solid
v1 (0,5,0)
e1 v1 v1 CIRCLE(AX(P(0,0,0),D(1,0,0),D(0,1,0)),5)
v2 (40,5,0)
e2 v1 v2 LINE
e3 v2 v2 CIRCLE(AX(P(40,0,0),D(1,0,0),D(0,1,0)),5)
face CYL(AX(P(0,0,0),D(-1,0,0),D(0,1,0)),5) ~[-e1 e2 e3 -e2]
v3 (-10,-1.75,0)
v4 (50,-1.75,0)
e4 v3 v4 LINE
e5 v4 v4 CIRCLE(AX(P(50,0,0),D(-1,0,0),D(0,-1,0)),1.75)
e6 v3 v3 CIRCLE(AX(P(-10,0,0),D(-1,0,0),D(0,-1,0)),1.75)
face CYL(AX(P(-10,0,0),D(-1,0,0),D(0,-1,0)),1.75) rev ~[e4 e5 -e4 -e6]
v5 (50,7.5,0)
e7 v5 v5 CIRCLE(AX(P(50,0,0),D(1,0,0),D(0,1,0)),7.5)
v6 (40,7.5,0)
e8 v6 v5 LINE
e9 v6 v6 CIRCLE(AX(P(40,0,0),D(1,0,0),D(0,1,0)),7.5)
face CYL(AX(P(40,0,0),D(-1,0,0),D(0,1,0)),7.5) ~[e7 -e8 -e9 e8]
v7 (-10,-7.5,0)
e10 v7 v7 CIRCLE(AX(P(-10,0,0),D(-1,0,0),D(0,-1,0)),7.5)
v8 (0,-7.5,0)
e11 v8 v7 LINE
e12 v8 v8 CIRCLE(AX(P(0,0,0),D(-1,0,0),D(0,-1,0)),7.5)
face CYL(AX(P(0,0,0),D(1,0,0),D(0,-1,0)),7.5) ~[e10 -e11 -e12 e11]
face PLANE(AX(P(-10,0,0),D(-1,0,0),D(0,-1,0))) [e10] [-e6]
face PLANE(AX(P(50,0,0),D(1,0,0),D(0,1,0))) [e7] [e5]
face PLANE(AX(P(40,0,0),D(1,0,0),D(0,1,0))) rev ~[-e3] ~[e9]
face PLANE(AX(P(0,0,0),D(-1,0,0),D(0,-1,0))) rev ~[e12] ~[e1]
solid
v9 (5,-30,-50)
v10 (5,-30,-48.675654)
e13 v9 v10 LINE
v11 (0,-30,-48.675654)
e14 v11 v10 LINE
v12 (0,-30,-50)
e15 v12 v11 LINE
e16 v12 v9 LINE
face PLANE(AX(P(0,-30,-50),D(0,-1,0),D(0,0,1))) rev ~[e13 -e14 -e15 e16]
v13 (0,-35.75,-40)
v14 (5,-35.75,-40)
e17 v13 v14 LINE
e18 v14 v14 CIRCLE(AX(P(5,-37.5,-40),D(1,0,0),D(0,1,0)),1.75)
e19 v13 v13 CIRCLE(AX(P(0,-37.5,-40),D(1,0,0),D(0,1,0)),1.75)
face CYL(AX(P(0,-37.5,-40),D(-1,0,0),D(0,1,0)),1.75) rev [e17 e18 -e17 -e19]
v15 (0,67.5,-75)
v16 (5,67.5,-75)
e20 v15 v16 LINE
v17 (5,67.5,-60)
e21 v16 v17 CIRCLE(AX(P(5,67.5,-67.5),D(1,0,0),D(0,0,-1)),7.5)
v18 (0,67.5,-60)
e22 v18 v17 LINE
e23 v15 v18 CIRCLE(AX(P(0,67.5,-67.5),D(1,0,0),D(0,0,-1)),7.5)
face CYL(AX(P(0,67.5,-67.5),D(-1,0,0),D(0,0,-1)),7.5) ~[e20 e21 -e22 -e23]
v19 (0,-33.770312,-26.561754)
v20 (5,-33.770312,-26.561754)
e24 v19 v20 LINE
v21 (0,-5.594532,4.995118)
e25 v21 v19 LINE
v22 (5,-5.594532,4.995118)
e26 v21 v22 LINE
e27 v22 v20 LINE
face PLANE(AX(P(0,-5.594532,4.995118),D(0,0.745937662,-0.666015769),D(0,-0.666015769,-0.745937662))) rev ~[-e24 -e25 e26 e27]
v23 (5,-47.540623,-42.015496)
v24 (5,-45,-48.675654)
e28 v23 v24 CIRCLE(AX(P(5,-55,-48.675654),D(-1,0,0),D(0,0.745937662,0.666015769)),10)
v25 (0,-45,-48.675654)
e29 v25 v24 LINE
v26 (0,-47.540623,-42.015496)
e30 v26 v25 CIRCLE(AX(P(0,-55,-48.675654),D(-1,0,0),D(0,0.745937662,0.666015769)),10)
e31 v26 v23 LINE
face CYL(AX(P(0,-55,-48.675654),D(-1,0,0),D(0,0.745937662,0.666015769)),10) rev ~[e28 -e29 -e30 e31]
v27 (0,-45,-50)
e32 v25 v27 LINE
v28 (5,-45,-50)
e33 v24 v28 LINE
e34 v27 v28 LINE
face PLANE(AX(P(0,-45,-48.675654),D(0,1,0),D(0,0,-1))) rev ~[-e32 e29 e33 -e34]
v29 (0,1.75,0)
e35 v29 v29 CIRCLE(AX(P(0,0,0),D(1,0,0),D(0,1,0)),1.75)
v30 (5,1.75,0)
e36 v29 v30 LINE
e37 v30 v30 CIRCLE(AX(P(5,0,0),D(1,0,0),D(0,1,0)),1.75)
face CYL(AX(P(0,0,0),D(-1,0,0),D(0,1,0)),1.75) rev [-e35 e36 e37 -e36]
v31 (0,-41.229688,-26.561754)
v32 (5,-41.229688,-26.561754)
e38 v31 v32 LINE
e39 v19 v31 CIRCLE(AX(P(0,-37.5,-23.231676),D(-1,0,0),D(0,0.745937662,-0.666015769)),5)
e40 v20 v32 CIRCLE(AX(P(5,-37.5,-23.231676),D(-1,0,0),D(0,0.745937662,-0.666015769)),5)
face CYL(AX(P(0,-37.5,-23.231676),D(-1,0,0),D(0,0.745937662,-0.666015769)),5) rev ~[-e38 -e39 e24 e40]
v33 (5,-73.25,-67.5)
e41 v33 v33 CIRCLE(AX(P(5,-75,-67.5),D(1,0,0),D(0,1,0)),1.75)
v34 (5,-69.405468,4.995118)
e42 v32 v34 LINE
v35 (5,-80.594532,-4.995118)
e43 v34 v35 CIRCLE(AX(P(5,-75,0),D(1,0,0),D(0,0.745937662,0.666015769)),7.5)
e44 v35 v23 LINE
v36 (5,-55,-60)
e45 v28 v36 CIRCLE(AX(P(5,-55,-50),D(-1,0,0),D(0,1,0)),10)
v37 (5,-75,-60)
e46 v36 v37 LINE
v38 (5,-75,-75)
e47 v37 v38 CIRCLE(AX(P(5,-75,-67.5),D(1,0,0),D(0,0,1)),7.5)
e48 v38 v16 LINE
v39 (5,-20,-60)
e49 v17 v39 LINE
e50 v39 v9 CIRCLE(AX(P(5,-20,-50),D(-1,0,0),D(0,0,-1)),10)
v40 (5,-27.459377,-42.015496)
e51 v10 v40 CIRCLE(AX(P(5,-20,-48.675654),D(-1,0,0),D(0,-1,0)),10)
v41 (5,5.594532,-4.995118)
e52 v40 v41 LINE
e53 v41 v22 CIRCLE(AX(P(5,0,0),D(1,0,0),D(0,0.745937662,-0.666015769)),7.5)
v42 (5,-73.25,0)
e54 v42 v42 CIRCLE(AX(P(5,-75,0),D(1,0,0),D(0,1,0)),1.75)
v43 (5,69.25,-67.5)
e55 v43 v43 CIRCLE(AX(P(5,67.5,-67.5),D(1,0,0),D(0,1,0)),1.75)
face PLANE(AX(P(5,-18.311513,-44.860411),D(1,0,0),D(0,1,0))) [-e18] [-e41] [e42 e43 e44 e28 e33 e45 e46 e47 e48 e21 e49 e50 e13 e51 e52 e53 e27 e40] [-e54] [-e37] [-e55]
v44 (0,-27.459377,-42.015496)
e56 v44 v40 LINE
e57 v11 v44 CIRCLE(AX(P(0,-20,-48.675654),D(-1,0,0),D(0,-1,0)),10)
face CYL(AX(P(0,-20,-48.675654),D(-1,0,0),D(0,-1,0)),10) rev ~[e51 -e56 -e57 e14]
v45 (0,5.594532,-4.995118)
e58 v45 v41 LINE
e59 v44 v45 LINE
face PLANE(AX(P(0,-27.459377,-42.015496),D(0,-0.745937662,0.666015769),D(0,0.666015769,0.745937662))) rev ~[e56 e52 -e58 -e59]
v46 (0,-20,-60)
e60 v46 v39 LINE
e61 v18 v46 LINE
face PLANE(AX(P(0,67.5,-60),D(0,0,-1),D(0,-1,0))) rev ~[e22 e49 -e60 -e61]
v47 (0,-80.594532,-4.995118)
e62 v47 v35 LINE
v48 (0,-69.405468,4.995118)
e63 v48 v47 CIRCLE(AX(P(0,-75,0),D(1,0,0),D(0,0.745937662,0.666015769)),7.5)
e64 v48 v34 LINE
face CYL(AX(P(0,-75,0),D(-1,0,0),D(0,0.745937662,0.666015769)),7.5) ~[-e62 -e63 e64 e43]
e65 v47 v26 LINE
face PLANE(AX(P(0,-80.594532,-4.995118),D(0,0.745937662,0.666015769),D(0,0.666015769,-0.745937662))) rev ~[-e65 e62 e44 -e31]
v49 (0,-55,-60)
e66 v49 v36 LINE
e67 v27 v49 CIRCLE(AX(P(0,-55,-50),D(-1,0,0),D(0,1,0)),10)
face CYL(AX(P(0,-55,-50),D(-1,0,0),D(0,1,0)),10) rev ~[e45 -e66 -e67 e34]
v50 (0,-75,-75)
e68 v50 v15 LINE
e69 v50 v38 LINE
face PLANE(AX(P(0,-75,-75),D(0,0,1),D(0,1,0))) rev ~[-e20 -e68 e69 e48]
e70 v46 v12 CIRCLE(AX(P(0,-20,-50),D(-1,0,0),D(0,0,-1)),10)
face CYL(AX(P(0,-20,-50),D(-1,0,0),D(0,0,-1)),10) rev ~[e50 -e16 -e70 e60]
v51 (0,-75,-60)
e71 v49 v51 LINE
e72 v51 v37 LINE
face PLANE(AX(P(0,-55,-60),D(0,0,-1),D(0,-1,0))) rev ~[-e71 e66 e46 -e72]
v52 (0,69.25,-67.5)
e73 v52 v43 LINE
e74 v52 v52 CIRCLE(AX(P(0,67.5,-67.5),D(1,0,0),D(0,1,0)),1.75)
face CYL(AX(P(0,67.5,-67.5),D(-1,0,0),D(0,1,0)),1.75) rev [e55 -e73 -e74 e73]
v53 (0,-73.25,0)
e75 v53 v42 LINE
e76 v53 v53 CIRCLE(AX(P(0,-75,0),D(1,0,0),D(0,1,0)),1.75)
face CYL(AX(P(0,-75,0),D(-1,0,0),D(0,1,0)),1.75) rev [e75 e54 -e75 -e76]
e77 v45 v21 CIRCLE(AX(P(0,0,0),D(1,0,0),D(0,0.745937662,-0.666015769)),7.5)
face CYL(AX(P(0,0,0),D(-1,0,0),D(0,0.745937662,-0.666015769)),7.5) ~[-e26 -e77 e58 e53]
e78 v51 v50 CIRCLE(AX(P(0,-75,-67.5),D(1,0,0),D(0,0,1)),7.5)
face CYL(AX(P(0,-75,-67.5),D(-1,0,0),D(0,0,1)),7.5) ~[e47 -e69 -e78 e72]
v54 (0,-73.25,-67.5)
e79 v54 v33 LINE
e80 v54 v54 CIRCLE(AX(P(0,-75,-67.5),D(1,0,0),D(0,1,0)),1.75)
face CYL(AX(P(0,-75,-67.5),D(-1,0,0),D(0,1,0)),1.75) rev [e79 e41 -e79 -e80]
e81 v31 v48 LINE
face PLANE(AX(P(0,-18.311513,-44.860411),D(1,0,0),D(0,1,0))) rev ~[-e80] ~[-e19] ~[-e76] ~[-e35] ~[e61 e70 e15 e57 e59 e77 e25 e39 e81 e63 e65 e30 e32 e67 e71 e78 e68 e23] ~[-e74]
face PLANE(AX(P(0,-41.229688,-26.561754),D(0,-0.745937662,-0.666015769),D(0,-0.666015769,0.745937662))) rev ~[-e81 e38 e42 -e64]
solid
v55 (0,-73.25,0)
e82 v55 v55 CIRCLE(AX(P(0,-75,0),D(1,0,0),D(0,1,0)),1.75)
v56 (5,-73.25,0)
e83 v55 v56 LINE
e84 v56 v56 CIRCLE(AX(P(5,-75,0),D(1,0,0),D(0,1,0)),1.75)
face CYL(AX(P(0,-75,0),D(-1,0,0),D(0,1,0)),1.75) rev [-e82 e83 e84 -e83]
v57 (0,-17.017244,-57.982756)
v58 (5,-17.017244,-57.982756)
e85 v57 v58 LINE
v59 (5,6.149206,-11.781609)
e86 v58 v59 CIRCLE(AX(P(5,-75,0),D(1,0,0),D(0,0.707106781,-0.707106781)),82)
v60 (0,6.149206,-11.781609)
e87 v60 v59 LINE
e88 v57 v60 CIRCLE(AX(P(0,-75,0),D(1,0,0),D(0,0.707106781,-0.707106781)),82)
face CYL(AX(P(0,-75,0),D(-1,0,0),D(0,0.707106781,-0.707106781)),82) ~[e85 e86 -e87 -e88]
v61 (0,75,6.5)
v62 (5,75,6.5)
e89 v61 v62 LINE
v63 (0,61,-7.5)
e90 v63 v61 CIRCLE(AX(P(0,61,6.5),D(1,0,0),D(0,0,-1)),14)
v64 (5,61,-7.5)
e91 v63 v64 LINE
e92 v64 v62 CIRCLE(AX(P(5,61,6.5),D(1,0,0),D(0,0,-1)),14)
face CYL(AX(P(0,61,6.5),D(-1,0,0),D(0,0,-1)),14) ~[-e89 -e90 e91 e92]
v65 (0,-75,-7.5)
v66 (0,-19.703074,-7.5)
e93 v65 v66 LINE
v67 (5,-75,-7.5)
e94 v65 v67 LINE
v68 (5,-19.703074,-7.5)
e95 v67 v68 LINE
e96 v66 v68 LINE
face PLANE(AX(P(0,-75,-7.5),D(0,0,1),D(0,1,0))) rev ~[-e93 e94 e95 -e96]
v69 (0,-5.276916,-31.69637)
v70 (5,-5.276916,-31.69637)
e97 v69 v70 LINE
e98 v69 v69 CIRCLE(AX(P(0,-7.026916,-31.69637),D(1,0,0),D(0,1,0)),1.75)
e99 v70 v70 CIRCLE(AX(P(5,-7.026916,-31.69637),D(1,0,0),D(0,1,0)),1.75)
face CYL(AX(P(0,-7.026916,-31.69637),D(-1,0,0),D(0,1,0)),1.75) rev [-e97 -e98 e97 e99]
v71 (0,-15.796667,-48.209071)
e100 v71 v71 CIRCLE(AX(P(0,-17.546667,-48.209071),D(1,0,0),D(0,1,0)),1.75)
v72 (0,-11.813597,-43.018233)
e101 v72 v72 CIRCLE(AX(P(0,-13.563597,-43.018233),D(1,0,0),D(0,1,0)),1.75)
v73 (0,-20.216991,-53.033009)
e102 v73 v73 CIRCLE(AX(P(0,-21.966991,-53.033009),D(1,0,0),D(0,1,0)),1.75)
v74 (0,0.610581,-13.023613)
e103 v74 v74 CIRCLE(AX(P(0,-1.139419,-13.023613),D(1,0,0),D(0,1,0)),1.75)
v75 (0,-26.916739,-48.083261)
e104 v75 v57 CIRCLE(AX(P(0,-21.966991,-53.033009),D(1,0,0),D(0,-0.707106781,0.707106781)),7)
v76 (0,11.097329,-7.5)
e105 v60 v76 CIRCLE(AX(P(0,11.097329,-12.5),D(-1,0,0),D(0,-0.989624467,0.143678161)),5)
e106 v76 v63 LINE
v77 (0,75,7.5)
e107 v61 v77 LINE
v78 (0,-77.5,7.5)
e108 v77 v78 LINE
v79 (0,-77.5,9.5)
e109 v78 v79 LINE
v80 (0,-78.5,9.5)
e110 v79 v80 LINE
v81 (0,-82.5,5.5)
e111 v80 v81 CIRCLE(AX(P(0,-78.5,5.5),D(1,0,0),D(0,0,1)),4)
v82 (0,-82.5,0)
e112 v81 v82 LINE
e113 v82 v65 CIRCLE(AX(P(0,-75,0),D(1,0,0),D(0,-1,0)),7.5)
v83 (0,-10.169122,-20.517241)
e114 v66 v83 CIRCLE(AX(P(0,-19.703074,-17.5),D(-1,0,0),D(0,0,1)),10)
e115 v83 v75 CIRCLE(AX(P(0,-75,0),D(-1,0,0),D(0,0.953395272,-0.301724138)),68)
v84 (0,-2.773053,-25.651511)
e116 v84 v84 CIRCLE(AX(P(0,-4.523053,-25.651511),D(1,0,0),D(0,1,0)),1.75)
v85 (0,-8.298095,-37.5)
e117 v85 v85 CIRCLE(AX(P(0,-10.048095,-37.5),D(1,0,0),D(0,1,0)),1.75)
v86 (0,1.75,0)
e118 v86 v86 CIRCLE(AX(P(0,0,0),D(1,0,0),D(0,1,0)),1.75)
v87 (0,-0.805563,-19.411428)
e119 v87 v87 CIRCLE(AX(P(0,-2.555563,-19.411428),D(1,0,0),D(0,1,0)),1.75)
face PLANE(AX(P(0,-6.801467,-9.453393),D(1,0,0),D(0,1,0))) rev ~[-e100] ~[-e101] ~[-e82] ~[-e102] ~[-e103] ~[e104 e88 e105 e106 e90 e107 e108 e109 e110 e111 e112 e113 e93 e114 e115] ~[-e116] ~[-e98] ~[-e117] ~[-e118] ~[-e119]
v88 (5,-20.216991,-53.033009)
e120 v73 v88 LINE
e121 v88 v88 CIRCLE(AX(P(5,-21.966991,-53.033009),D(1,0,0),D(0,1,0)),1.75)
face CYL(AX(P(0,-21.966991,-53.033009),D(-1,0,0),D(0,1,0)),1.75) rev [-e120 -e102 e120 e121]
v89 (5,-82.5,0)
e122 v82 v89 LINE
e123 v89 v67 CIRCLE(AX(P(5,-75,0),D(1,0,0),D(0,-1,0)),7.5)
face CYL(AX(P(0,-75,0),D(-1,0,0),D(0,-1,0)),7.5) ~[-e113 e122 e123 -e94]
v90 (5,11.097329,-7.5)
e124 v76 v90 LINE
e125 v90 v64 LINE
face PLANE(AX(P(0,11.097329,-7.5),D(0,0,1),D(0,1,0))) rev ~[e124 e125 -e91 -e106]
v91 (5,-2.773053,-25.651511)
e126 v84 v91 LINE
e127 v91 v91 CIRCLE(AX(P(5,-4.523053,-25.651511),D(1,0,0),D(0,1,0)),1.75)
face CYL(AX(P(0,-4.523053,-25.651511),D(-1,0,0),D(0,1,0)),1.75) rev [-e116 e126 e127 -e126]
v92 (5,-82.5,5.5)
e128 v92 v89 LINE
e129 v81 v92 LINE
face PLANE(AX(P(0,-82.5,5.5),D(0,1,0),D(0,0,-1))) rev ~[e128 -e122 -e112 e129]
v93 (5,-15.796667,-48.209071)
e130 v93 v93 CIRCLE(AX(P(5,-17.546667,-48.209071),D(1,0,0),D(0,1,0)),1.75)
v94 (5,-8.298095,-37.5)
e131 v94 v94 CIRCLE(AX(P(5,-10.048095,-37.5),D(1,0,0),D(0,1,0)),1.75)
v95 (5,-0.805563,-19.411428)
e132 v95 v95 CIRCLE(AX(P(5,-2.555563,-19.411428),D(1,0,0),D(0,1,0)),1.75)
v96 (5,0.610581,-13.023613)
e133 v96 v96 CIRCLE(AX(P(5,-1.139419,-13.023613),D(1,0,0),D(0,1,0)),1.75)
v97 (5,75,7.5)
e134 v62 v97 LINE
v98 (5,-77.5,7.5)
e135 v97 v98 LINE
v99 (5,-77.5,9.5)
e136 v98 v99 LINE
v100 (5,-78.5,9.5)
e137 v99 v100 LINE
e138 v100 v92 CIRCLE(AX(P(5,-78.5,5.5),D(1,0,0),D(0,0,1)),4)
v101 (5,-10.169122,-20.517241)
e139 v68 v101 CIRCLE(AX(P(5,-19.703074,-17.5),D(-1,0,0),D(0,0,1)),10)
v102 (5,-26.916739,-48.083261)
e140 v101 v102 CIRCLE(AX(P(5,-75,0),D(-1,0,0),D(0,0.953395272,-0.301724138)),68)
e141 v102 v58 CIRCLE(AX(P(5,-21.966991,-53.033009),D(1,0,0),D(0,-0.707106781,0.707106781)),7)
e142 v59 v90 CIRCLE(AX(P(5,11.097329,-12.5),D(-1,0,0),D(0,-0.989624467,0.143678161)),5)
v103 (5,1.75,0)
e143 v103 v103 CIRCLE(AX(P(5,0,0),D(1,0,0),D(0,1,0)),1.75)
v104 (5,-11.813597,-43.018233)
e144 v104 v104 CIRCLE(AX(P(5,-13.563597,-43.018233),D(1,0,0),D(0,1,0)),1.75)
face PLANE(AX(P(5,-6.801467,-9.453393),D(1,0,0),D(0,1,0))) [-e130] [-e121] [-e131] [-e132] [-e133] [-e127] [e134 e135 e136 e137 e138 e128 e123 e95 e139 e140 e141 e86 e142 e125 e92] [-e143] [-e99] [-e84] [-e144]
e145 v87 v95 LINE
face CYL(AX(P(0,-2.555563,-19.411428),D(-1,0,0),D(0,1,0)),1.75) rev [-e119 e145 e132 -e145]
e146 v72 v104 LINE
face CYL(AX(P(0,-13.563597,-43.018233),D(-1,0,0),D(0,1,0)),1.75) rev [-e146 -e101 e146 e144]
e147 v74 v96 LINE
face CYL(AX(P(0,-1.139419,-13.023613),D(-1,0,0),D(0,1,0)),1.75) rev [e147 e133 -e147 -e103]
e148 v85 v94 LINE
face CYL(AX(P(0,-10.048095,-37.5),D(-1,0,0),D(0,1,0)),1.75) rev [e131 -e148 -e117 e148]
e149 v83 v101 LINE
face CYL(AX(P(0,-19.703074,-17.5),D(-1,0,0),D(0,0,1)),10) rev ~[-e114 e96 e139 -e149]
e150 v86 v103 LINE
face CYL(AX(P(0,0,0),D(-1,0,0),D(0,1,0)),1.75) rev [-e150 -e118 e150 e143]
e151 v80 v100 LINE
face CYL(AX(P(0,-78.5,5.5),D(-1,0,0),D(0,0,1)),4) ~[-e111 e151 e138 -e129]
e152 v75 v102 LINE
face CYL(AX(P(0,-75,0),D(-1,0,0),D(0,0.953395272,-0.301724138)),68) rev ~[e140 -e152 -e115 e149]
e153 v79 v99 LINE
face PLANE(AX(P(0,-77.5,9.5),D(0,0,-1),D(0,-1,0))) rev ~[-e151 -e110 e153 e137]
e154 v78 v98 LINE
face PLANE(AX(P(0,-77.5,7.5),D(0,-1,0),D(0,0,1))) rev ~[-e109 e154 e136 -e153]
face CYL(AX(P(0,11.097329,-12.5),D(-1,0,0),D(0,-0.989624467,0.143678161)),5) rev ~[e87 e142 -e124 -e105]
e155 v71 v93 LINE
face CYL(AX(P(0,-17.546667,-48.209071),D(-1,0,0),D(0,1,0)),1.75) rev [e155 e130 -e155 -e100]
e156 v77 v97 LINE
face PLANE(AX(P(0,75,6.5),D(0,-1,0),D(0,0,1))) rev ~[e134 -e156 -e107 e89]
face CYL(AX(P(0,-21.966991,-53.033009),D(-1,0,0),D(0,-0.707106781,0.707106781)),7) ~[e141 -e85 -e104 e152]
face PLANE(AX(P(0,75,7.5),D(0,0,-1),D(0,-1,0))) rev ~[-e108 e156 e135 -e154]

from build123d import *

# Parameters (mm, degrees)
F0_R      = 1.75
F1_DEPTH  = 5
F2_R      = 1.75
F3_DEPTH  = 5
F4_R      = 5
F5_DEPTH  = 40
F6_R      = 7.5
F7_DEPTH  = 10
F8_R      = 7.5
F9_DEPTH  = 10
F10_R     = 1.75
F11_DEPTH = 60.001


with BuildPart() as f1:
    # F0 (on Right) → F1 (new body)
    with BuildSketch(Plane.YZ):
        with BuildLine():
            Line((75, 7.5), (-75, 7.5))
            Line((-75, 7.5), (-77.5, 7.5))
            Line((-77.5, 7.5), (-77.5, 9.5))
            Line((-77.5, 9.5), (-78.5, 9.5))
            ThreePointArc((-78.5, 9.5), (-81.3284271247, 8.3284271247), (-82.5, 5.5))
            Line((-82.5, 5.5), (-82.5, 0))
            ThreePointArc((-82.5, 0), (-80.3033008589, -5.3033008589), (-75, -7.5))
            Line((-75, -7.5), (-19.7030742265, -7.5))
            ThreePointArc((-19.7030742265, -7.5), (-11.6354719249, -11.5912105213), (-10.1691215069, -20.5172413793))
            ThreePointArc((-10.1691215069, -20.5172413793), (-16.8848376732, -35.3076182675), (-26.9167388793, -48.0832611207))
            ThreePointArc((-26.9167388793, -48.0832611207), (-26.9167388793, -57.9827560573), (-17.0172439427, -57.9827560573))
            ThreePointArc((-17.0172439427, -57.9827560573), (-1.6988251739, -36.7551053475), (6.1492063101, -11.7816091954))
            ThreePointArc((6.1492063101, -11.7816091954), (7.8256283254, -8.7189978826), (11.0973286461, -7.5))
            Line((11.0973286461, -7.5), (61, -7.5))
            ThreePointArc((61, -7.5), (70.8994949366, -3.3994949366), (75, 6.5))
            Line((75, 6.5), (75, 7.5))
        make_face()
        with Locations((-21.966991411, -53.033008589)):
            Circle(F0_R, mode=Mode.SUBTRACT)
        with Locations((-17.5466667661, -48.2090707265)):
            Circle(F0_R, mode=Mode.SUBTRACT)
        with Locations((-13.5635966783, -43.0182327263)):
            Circle(F0_R, mode=Mode.SUBTRACT)
        with Locations((-10.0480947162, -37.5)):
            Circle(F0_R, mode=Mode.SUBTRACT)
        with Locations((-7.0269159723, -31.6963696306)):
            Circle(F0_R, mode=Mode.SUBTRACT)
        with Locations((-4.5230534411, -25.6515107494)):
            Circle(F0_R, mode=Mode.SUBTRACT)
        with Locations((-75, 0)):
            Circle(F0_R, mode=Mode.SUBTRACT)
        with Locations((-2.5555630283, -19.4114283827)):
            Circle(F0_R, mode=Mode.SUBTRACT)
        with Locations((-1.1394185241, -13.023613325)):
            Circle(F0_R, mode=Mode.SUBTRACT)
        Circle(F0_R, mode=Mode.SUBTRACT)
    extrude(amount=F1_DEPTH)


with BuildPart() as f3:
    # F2 (on Right) → F3 (new body)
    with BuildSketch(Plane.YZ):
        with BuildLine():
            Line((-41.2296883081, -26.5617544674), (-69.4054675378, 4.9951182698))
            ThreePointArc((-69.4054675378, 4.9951182698), (-79.9951182698, 5.5945324622), (-80.5945324622, -4.9951182698))
            Line((-80.5945324622, -4.9951182698), (-47.5406233837, -42.0154964377))
            ThreePointArc((-47.5406233837, -42.0154964377), (-45.6567198971, -45.1115109071), (-45, -48.6756541308))
            Line((-45, -48.6756541308), (-45, -50))
            ThreePointArc((-45, -50), (-47.9289321881, -57.0710678119), (-55, -60))
            Line((-55, -60), (-75, -60))
            ThreePointArc((-75, -60), (-82.5, -67.5), (-75, -75))
            Line((-75, -75), (67.5, -75))
            ThreePointArc((67.5, -75), (72.8033008589, -72.8033008589), (75, -67.5))
            ThreePointArc((75, -67.5), (72.8033008589, -62.1966991411), (67.5, -60))
            Line((67.5, -60), (-20, -60))
            ThreePointArc((-20, -60), (-27.0710678119, -57.0710678119), (-30, -50))
            Line((-30, -50), (-30, -48.6756541308))
            ThreePointArc((-30, -48.6756541308), (-29.3432801029, -45.1115109071), (-27.4593766163, -42.0154964377))
            Line((-27.4593766163, -42.0154964377), (5.5945324622, -4.9951182698))
            ThreePointArc((5.5945324622, -4.9951182698), (4.9951182698, 5.5945324622), (-5.5945324622, 4.9951182698))
            Line((-5.5945324622, 4.9951182698), (-33.7703116919, -26.5617544674))
            ThreePointArc((-33.7703116919, -26.5617544674), (-37.5, -28.2316756209), (-41.2296883081, -26.5617544674))
        make_face()
        with Locations((-75, -67.5)):
            Circle(F2_R, mode=Mode.SUBTRACT)
        with Locations((-37.5, -40)):
            Circle(F2_R, mode=Mode.SUBTRACT)
        with Locations((67.5, -67.5)):
            Circle(F2_R, mode=Mode.SUBTRACT)
        with Locations((-75, 0)):
            Circle(F2_R, mode=Mode.SUBTRACT)
        Circle(F2_R, mode=Mode.SUBTRACT)
    extrude(amount=F3_DEPTH)


with BuildPart() as f5:
    # F4 (on Right) → F5 (new body)
    with BuildSketch(Plane.YZ):
        Circle(F4_R)
    extrude(amount=F5_DEPTH)

    # F6 (on face) → F7 (join)
    with BuildSketch(Plane.YZ.offset(40)):
        Circle(F6_R)
    extrude(amount=F7_DEPTH)

    # F8 (on face) → F9 (join)
    with BuildSketch(Plane(origin=(0, 0, 0), x_dir=(0, -1, 0), z_dir=(-1, 0, 0))):
        Circle(F8_R)
    extrude(amount=F9_DEPTH)

    # F10 (on face) → F11 (cut, through all)
    with BuildSketch(Plane(origin=(-10, 0, 0), x_dir=(0, -1, 0), z_dir=(-1, 0, 0))):
        Circle(F10_R)
    extrude(amount=-F11_DEPTH, mode=Mode.SUBTRACT)


solid = Compound([f1.part, f3.part, f5.part])
